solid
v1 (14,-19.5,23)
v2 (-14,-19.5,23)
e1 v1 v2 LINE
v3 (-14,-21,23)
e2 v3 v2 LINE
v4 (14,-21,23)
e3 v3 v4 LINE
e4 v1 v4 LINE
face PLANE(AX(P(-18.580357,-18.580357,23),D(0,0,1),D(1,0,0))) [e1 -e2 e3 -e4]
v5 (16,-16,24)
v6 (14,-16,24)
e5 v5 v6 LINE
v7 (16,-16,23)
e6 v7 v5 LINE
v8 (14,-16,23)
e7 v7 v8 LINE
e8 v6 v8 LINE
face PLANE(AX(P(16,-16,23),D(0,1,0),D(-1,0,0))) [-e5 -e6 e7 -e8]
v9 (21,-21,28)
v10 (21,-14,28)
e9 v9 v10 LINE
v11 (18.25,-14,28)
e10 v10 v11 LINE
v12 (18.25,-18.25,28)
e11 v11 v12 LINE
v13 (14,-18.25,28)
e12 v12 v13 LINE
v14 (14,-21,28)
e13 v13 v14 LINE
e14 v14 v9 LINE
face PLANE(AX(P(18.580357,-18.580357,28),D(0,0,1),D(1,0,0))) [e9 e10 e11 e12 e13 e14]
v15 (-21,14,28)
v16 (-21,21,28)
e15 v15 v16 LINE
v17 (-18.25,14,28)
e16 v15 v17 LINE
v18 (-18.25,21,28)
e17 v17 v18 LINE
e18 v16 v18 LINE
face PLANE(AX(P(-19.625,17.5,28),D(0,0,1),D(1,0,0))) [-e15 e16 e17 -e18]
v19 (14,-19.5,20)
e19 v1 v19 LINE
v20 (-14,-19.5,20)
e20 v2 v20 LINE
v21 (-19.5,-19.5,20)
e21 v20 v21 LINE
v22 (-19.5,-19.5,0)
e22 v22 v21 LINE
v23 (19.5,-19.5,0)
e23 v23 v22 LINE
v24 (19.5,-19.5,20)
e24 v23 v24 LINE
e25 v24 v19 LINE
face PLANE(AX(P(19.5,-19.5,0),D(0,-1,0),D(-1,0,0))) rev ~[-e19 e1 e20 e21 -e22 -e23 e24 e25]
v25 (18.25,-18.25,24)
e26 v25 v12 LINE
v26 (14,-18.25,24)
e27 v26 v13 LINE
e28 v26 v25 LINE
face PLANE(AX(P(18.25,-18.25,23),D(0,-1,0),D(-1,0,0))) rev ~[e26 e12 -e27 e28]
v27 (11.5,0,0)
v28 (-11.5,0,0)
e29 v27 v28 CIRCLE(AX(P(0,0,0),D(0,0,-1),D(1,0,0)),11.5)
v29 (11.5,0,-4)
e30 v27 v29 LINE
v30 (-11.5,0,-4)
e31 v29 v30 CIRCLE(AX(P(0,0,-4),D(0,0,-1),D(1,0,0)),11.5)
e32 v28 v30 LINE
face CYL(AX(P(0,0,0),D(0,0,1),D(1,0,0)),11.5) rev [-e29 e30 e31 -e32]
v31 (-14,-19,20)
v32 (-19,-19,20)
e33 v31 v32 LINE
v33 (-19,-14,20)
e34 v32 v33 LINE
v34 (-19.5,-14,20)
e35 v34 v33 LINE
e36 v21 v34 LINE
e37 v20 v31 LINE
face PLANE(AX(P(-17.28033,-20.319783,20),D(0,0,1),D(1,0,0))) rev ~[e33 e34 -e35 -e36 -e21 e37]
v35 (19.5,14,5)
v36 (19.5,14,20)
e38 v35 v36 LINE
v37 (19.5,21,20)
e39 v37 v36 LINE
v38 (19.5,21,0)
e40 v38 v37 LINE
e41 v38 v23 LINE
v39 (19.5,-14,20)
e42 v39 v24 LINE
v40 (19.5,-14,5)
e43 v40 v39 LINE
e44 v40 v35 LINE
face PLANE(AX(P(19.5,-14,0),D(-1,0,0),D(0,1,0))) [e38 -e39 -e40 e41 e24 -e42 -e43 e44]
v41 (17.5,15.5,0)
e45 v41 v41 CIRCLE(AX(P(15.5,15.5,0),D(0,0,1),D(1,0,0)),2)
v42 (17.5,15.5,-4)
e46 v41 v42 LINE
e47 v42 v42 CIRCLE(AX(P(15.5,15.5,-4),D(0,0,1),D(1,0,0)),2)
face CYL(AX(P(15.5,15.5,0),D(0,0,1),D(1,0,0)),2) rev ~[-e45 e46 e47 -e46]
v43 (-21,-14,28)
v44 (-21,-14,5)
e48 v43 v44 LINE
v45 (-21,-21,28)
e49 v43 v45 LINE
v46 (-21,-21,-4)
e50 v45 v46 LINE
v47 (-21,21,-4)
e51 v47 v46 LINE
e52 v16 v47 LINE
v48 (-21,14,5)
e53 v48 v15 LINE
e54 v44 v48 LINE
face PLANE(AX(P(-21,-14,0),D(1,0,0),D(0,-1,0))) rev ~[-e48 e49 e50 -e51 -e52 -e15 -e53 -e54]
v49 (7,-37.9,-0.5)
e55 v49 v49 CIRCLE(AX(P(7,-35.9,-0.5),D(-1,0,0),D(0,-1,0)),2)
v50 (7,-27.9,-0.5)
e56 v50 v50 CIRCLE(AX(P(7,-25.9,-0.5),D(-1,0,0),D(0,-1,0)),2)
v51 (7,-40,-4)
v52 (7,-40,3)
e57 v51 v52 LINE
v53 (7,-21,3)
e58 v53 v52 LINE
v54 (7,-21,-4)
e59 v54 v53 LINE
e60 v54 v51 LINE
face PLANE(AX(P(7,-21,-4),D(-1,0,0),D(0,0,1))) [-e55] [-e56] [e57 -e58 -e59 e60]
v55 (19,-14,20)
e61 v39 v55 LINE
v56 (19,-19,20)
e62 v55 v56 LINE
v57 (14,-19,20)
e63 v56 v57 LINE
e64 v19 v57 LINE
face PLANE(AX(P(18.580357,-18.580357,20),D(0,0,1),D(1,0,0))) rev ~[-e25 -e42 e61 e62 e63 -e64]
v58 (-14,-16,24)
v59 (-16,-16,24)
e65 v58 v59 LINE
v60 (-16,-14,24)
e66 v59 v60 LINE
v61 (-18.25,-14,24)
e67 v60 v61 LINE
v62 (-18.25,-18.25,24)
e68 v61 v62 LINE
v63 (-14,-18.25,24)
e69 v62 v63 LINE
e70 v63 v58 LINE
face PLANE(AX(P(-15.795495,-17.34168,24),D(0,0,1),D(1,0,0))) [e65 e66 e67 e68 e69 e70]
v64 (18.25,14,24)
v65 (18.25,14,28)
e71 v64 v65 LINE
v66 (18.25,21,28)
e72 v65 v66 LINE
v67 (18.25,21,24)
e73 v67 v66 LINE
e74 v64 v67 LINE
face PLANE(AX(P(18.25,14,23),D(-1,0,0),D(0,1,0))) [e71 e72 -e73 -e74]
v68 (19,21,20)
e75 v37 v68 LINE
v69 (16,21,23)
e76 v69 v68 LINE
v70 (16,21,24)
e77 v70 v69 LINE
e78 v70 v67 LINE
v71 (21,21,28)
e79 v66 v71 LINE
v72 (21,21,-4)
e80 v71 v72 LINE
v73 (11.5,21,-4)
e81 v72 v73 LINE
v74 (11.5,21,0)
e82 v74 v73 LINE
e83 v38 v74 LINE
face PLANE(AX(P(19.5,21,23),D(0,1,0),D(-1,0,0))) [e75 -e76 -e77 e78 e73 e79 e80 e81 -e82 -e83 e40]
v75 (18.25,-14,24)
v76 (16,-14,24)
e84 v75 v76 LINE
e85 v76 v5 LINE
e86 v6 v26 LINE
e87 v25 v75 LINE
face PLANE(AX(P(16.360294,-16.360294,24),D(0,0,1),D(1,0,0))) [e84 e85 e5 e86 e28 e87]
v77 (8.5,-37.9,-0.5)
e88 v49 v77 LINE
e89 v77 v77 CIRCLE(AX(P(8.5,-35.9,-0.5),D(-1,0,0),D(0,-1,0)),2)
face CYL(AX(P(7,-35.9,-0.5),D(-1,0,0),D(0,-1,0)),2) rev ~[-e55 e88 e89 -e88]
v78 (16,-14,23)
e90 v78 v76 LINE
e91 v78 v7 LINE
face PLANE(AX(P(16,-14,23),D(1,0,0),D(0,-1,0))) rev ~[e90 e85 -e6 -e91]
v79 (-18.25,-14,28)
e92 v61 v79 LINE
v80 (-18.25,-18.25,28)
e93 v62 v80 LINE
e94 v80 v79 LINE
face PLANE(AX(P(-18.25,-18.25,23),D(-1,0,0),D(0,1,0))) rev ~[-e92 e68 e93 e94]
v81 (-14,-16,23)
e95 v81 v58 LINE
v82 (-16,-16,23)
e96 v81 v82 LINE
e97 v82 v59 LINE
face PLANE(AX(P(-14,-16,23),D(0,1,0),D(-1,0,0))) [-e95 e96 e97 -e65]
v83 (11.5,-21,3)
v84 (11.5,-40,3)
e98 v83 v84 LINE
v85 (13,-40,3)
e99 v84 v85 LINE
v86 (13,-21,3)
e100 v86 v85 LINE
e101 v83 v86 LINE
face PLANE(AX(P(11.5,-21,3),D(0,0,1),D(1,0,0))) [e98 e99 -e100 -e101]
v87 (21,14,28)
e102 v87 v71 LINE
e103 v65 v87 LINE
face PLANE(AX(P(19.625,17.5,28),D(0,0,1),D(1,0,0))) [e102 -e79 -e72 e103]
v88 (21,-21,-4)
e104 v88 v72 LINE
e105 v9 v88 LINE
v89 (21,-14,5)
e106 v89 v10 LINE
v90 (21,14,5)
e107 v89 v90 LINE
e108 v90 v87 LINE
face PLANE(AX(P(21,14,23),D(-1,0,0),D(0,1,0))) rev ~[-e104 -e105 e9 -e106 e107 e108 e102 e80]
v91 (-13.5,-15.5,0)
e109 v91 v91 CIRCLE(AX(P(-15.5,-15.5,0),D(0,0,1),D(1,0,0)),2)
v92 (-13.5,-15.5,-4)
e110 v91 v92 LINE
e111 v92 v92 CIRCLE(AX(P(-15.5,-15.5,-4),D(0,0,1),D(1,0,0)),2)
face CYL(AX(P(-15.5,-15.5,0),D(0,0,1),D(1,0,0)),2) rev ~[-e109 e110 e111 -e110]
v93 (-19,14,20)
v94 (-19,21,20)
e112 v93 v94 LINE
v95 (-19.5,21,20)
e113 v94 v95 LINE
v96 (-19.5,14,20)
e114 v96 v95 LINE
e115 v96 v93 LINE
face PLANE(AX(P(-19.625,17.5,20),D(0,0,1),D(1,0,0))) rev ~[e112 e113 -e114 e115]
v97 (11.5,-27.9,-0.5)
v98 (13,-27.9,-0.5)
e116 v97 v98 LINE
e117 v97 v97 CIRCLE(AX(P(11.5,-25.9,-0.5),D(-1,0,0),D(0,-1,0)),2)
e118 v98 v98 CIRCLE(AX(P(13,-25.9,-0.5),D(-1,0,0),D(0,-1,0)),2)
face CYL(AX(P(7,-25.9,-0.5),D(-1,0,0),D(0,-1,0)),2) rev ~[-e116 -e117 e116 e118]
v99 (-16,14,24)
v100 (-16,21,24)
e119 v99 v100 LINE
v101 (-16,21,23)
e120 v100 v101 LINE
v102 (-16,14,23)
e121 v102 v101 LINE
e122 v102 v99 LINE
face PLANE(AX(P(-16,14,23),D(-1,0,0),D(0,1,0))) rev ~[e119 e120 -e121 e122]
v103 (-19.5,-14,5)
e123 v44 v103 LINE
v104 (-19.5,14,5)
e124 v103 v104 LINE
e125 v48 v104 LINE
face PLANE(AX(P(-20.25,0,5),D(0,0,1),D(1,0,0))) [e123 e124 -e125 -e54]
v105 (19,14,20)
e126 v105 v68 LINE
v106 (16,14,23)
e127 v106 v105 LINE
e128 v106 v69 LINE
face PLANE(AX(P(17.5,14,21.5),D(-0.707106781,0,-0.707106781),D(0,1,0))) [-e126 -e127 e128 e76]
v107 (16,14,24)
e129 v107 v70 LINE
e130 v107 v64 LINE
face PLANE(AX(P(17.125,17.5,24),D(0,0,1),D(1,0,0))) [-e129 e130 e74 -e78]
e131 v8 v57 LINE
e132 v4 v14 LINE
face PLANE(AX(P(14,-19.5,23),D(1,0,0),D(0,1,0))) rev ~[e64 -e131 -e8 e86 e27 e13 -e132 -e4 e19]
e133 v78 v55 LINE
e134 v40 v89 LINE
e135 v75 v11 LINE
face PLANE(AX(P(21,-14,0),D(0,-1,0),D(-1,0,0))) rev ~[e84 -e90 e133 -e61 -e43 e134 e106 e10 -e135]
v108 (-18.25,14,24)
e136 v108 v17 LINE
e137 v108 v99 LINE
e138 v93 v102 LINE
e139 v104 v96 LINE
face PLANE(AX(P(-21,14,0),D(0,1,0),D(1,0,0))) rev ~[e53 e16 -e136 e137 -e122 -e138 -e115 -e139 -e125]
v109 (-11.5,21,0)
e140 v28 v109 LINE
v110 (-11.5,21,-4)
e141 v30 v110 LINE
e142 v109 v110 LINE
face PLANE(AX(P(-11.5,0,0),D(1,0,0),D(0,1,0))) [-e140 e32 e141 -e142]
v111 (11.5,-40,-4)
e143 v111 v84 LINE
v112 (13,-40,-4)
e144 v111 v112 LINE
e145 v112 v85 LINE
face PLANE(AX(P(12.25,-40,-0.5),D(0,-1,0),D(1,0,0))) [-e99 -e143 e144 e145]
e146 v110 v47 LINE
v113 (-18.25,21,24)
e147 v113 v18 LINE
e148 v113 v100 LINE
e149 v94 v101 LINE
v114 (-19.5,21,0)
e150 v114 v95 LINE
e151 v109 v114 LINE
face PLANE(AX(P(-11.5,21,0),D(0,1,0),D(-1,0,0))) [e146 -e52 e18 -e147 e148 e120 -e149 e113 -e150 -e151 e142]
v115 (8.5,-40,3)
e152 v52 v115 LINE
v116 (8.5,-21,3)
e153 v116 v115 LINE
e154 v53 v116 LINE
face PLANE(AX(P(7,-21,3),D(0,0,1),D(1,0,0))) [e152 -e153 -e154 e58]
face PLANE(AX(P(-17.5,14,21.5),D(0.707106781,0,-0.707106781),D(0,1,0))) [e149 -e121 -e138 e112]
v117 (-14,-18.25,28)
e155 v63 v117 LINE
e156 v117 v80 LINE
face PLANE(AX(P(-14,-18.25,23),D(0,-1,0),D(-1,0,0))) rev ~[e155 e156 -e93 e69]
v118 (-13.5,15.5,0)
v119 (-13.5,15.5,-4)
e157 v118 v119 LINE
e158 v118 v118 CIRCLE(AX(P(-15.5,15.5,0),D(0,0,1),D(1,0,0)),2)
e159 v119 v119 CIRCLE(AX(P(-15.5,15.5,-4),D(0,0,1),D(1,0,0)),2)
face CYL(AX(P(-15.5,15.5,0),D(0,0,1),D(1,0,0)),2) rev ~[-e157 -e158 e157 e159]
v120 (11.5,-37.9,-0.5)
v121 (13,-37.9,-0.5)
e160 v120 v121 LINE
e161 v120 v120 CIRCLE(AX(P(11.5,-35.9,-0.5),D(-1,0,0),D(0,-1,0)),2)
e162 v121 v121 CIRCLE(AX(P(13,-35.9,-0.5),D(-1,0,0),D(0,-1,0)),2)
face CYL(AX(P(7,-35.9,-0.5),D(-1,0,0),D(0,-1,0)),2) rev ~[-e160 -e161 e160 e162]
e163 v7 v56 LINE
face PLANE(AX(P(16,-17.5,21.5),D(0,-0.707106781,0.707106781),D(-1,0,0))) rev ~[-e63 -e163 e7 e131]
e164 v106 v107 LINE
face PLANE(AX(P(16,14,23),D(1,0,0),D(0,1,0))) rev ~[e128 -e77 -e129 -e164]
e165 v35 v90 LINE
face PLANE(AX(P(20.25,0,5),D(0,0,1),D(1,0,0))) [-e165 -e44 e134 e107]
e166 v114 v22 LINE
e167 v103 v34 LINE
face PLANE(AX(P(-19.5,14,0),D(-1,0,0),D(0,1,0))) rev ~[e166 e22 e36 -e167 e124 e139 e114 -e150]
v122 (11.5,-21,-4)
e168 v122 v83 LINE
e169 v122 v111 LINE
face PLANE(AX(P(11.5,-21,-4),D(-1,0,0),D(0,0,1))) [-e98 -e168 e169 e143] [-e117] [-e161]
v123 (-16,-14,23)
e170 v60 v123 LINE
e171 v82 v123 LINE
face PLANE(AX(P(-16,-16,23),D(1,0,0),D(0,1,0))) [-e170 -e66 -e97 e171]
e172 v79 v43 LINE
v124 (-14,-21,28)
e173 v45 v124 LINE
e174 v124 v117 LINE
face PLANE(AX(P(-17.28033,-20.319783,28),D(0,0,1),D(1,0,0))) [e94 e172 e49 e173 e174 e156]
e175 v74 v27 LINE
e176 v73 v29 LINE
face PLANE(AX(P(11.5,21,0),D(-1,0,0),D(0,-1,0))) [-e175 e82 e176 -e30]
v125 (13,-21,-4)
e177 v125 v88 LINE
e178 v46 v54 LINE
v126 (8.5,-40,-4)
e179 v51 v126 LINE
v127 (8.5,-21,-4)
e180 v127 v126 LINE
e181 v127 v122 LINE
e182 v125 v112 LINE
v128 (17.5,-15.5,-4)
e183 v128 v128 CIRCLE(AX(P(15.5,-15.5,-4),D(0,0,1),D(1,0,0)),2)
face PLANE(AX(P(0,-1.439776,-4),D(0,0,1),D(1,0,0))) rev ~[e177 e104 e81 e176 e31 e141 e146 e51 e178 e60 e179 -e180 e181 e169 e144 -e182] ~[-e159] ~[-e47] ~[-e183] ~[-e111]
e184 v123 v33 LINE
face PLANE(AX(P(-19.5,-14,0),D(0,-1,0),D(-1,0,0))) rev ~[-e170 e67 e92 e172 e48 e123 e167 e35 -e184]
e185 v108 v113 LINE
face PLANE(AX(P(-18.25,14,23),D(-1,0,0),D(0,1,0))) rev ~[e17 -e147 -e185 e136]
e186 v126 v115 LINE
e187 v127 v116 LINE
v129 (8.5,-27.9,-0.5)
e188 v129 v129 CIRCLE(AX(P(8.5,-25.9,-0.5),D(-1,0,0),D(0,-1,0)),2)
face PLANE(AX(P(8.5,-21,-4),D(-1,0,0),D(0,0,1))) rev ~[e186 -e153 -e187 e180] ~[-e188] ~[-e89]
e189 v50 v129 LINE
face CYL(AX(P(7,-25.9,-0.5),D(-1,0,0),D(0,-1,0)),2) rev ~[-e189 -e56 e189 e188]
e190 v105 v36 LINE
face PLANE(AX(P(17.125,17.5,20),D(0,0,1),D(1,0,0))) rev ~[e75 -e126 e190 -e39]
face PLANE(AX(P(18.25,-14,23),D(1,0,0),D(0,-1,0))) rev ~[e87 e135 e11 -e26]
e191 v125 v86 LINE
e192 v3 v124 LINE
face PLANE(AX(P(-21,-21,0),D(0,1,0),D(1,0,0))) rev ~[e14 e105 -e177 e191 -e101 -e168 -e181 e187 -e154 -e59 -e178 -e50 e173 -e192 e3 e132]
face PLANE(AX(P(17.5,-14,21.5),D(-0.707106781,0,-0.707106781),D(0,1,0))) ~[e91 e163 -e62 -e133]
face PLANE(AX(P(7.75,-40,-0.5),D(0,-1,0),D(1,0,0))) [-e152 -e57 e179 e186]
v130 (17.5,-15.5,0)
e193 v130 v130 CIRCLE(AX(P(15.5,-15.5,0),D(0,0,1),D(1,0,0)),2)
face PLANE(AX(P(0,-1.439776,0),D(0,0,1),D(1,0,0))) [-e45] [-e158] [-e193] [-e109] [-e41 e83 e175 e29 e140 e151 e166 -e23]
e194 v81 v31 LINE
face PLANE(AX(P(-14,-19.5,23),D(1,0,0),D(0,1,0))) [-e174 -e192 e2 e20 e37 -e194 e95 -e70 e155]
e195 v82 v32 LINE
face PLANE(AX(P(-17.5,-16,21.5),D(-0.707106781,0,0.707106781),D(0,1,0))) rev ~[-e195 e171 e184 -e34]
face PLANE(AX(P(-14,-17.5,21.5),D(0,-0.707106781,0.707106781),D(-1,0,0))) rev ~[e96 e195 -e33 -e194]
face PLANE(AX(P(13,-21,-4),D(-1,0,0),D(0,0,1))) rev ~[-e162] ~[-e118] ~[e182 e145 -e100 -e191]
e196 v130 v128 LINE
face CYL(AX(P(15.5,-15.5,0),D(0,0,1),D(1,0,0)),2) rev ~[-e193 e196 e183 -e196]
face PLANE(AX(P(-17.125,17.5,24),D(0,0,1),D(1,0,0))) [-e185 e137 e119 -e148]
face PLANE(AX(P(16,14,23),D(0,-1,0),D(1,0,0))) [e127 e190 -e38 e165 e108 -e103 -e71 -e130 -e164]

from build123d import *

# Parameters (mm, degrees)
F0_R      = 2
F0_W      = 1.5
F0_H      = 28
F0_W_2    = 28
F0_H_2    = 1.5
F0_W_3    = 8
F1_DEPTH  = 4
F2_DEPTH  = 23
F3_DEPTH  = 5
F4_W      = 2.75
F4_H      = 7
F5_DEPTH  = 5
F4_W_2    = 2.25
F6_DEPTH  = 1
F7_DEPTH  = 3
F8_SIZE   = 3
F9_W      = 1.5
F9_H      = 7
F10_DEPTH = 19
F11_R     = 2
F12_DEPTH = 14.001


# Not quite as in the source:
# - a feature names something its author has since deleted; it is built from what else it names


with BuildPart() as f1:
    # F0 (on Top) → F1 (new body)
    with BuildSketch(Plane.XY):
        with BuildLine():
            Line((-11.5, 19.5), (-19.5, 19.5))
            Line((-19.5, 19.5), (-19.5, 14))
            Line((-19.5, 14), (-19.5, -14))
            Line((-19.5, -14), (-19.5, -19.5))
            Line((-19.5, -19.5), (-14, -19.5))
            Line((-14, -19.5), (14, -19.5))
            Line((14, -19.5), (19.5, -19.5))
            Line((19.5, -19.5), (19.5, -14))
            Line((19.5, -14), (19.5, 14))
            Line((19.5, 14), (19.5, 19.5))
            Line((19.5, 19.5), (11.5, 19.5))
            Line((11.5, 19.5), (11.5, 0))
            ThreePointArc((11.5, 0), (0, -11.5), (-11.5, 0))
            Line((-11.5, 0), (-11.5, 19.5))
        make_face()
        with Locations((-15.5, -15.5)):
            Circle(F0_R, mode=Mode.SUBTRACT)
        with Locations((15.5, -15.5)):
            Circle(F0_R, mode=Mode.SUBTRACT)
        with Locations((-15.5, 15.5)):
            Circle(F0_R, mode=Mode.SUBTRACT)
        with Locations((15.5, 15.5)):
            Circle(F0_R, mode=Mode.SUBTRACT)
        with Locations((-20.25, 0)):
            Rectangle(F0_W, F0_H)
        Polygon((19.5, 21), (19.5, 19.5), (19.5, 14), (21, 14), (21, 21), align=None)
        Polygon((21, -14), (19.5, -14), (19.5, -19.5), (14, -19.5), (14, -21), (21, -21), align=None)
        Polygon((-19.5, -19.5), (-19.5, -14), (-21, -14), (-21, -21), (-14, -21), (-14, -19.5), align=None)
        Polygon((-19.5, 14), (-19.5, 19.5), (-19.5, 21), (-21, 21), (-21, 14), align=None)
        with Locations((20.25, 0)):
            Rectangle(F0_W, F0_H)
        with Locations((0, -20.25)):
            Rectangle(F0_W_2, F0_H_2)
        with Locations((-15.5, 20.25)):
            Rectangle(F0_W_3, F0_H_2)
        with Locations((15.5, 20.25)):
            Rectangle(F0_W_3, F0_H_2)
    extrude(amount=-F1_DEPTH)

    # F0 (on Top) → F2 (join)
    with BuildSketch(Plane.XY):
        Polygon((-19.5, -19.5), (-19.5, -14), (-21, -14), (-21, -21), (-14, -21), (-14, -19.5), align=None)
        Polygon((21, -14), (19.5, -14), (19.5, -19.5), (14, -19.5), (14, -21), (21, -21), align=None)
        Polygon((-19.5, 14), (-19.5, 19.5), (-19.5, 21), (-21, 21), (-21, 14), align=None)
        Polygon((19.5, 21), (19.5, 19.5), (19.5, 14), (21, 14), (21, 21), align=None)
        with Locations((0, -20.25)):
            Rectangle(F0_W_2, F0_H_2)
    extrude(amount=F2_DEPTH)

    # F0 (on Top) → F3 (join)
    with BuildSketch(Plane.XY):
        with Locations((20.25, 0)):
            Rectangle(F0_W, F0_H)
        with Locations((-20.25, 0)):
            Rectangle(F0_W, F0_H)
    extrude(amount=F3_DEPTH)

    # F4 (on face) → F5 (join)
    with BuildSketch(Plane.XY.offset(23)):
        with Locations((19.625, 17.5)):
            Rectangle(F4_W, F4_H)
        Polygon((14, -19.5), (14, -21), (21, -21), (21, -14), (19.5, -14), (19.5, -19.5), align=None)
        Polygon((-19.5, -19.5), (-21, -21), (-14, -21), (-14, -19.5), align=None)
        Polygon((-18.25, -18.25), (-19.5, -19.5), (-14, -19.5), (-14, -18.25), align=None)
        Polygon((-18.25, -14), (-19.5, -14), (-19.5, -19.5), (-18.25, -18.25), align=None)
        Polygon((-19.5, -14), (-21, -14), (-21, -21), (-19.5, -19.5), align=None)
        with Locations((-19.625, 17.5)):
            Rectangle(F4_W, F4_H)
        Polygon((14, -18.25), (14, -19.5), (19.5, -19.5), (19.5, -14), (18.25, -14), (18.25, -18.25), align=None)
    extrude(amount=F5_DEPTH)

    # F4 (on face) → F6 (join)
    with BuildSketch(Plane.XY.offset(23)):
        with Locations((17.125, 17.5)):
            Rectangle(F4_W_2, F4_H)
        Polygon((14, -16), (14, -18.25), (18.25, -18.25), (18.25, -14), (16, -14), (16, -16), align=None)
        Polygon((-16, -16), (-18.25, -18.25), (-14, -18.25), (-14, -16), align=None)
        Polygon((-16, -14), (-18.25, -14), (-18.25, -18.25), (-16, -16), align=None)
        with Locations((-17.125, 17.5)):
            Rectangle(F4_W_2, F4_H)
    extrude(amount=F6_DEPTH)

    # F7 (add): faces of the model
    f7_faces = [f1.faces().sort_by_distance(p)[0] for p in [
        (17.75, 17.5, 23),
        (17.0166666667, -17.0166666667, 23),
        (-17.0166666667, -17.0166666667, 23),
        (-17.75, 17.5, 23),
    ]]
    extrude(f7_faces, amount=F7_DEPTH)

    # F8
    f8_edges = [f1.edges().sort_by_distance(p)[0] for p in [
        (16, 17.5, 20),
        (15, -16, 20),
        (16, -15, 20),
        (-15, -16, 20),
        (-16, -15, 20),
        (-16, 17.5, 20),
    ]]
    chamfer(f8_edges, length=F8_SIZE)

    # F9 (on face) → F10 (join)
    with BuildSketch(Plane.XZ.offset(21)):
        with Locations((7.75, -0.5)):
            Rectangle(F9_W, F9_H)
        with Locations((12.25, -0.5)):
            Rectangle(F9_W, F9_H)
    extrude(amount=F10_DEPTH)

    # F11 (on face) → F12 (cut, through all)
    with BuildSketch(Plane(origin=(7, 0, 0), x_dir=(0, -1, 0), z_dir=(-1, 0, 0))):
        with Locations((25.9, -0.5)):
            Circle(F11_R)
        with Locations((35.9, -0.5)):
            Circle(F11_R)
    extrude(amount=-F12_DEPTH, mode=Mode.SUBTRACT)


solid = f1.part
